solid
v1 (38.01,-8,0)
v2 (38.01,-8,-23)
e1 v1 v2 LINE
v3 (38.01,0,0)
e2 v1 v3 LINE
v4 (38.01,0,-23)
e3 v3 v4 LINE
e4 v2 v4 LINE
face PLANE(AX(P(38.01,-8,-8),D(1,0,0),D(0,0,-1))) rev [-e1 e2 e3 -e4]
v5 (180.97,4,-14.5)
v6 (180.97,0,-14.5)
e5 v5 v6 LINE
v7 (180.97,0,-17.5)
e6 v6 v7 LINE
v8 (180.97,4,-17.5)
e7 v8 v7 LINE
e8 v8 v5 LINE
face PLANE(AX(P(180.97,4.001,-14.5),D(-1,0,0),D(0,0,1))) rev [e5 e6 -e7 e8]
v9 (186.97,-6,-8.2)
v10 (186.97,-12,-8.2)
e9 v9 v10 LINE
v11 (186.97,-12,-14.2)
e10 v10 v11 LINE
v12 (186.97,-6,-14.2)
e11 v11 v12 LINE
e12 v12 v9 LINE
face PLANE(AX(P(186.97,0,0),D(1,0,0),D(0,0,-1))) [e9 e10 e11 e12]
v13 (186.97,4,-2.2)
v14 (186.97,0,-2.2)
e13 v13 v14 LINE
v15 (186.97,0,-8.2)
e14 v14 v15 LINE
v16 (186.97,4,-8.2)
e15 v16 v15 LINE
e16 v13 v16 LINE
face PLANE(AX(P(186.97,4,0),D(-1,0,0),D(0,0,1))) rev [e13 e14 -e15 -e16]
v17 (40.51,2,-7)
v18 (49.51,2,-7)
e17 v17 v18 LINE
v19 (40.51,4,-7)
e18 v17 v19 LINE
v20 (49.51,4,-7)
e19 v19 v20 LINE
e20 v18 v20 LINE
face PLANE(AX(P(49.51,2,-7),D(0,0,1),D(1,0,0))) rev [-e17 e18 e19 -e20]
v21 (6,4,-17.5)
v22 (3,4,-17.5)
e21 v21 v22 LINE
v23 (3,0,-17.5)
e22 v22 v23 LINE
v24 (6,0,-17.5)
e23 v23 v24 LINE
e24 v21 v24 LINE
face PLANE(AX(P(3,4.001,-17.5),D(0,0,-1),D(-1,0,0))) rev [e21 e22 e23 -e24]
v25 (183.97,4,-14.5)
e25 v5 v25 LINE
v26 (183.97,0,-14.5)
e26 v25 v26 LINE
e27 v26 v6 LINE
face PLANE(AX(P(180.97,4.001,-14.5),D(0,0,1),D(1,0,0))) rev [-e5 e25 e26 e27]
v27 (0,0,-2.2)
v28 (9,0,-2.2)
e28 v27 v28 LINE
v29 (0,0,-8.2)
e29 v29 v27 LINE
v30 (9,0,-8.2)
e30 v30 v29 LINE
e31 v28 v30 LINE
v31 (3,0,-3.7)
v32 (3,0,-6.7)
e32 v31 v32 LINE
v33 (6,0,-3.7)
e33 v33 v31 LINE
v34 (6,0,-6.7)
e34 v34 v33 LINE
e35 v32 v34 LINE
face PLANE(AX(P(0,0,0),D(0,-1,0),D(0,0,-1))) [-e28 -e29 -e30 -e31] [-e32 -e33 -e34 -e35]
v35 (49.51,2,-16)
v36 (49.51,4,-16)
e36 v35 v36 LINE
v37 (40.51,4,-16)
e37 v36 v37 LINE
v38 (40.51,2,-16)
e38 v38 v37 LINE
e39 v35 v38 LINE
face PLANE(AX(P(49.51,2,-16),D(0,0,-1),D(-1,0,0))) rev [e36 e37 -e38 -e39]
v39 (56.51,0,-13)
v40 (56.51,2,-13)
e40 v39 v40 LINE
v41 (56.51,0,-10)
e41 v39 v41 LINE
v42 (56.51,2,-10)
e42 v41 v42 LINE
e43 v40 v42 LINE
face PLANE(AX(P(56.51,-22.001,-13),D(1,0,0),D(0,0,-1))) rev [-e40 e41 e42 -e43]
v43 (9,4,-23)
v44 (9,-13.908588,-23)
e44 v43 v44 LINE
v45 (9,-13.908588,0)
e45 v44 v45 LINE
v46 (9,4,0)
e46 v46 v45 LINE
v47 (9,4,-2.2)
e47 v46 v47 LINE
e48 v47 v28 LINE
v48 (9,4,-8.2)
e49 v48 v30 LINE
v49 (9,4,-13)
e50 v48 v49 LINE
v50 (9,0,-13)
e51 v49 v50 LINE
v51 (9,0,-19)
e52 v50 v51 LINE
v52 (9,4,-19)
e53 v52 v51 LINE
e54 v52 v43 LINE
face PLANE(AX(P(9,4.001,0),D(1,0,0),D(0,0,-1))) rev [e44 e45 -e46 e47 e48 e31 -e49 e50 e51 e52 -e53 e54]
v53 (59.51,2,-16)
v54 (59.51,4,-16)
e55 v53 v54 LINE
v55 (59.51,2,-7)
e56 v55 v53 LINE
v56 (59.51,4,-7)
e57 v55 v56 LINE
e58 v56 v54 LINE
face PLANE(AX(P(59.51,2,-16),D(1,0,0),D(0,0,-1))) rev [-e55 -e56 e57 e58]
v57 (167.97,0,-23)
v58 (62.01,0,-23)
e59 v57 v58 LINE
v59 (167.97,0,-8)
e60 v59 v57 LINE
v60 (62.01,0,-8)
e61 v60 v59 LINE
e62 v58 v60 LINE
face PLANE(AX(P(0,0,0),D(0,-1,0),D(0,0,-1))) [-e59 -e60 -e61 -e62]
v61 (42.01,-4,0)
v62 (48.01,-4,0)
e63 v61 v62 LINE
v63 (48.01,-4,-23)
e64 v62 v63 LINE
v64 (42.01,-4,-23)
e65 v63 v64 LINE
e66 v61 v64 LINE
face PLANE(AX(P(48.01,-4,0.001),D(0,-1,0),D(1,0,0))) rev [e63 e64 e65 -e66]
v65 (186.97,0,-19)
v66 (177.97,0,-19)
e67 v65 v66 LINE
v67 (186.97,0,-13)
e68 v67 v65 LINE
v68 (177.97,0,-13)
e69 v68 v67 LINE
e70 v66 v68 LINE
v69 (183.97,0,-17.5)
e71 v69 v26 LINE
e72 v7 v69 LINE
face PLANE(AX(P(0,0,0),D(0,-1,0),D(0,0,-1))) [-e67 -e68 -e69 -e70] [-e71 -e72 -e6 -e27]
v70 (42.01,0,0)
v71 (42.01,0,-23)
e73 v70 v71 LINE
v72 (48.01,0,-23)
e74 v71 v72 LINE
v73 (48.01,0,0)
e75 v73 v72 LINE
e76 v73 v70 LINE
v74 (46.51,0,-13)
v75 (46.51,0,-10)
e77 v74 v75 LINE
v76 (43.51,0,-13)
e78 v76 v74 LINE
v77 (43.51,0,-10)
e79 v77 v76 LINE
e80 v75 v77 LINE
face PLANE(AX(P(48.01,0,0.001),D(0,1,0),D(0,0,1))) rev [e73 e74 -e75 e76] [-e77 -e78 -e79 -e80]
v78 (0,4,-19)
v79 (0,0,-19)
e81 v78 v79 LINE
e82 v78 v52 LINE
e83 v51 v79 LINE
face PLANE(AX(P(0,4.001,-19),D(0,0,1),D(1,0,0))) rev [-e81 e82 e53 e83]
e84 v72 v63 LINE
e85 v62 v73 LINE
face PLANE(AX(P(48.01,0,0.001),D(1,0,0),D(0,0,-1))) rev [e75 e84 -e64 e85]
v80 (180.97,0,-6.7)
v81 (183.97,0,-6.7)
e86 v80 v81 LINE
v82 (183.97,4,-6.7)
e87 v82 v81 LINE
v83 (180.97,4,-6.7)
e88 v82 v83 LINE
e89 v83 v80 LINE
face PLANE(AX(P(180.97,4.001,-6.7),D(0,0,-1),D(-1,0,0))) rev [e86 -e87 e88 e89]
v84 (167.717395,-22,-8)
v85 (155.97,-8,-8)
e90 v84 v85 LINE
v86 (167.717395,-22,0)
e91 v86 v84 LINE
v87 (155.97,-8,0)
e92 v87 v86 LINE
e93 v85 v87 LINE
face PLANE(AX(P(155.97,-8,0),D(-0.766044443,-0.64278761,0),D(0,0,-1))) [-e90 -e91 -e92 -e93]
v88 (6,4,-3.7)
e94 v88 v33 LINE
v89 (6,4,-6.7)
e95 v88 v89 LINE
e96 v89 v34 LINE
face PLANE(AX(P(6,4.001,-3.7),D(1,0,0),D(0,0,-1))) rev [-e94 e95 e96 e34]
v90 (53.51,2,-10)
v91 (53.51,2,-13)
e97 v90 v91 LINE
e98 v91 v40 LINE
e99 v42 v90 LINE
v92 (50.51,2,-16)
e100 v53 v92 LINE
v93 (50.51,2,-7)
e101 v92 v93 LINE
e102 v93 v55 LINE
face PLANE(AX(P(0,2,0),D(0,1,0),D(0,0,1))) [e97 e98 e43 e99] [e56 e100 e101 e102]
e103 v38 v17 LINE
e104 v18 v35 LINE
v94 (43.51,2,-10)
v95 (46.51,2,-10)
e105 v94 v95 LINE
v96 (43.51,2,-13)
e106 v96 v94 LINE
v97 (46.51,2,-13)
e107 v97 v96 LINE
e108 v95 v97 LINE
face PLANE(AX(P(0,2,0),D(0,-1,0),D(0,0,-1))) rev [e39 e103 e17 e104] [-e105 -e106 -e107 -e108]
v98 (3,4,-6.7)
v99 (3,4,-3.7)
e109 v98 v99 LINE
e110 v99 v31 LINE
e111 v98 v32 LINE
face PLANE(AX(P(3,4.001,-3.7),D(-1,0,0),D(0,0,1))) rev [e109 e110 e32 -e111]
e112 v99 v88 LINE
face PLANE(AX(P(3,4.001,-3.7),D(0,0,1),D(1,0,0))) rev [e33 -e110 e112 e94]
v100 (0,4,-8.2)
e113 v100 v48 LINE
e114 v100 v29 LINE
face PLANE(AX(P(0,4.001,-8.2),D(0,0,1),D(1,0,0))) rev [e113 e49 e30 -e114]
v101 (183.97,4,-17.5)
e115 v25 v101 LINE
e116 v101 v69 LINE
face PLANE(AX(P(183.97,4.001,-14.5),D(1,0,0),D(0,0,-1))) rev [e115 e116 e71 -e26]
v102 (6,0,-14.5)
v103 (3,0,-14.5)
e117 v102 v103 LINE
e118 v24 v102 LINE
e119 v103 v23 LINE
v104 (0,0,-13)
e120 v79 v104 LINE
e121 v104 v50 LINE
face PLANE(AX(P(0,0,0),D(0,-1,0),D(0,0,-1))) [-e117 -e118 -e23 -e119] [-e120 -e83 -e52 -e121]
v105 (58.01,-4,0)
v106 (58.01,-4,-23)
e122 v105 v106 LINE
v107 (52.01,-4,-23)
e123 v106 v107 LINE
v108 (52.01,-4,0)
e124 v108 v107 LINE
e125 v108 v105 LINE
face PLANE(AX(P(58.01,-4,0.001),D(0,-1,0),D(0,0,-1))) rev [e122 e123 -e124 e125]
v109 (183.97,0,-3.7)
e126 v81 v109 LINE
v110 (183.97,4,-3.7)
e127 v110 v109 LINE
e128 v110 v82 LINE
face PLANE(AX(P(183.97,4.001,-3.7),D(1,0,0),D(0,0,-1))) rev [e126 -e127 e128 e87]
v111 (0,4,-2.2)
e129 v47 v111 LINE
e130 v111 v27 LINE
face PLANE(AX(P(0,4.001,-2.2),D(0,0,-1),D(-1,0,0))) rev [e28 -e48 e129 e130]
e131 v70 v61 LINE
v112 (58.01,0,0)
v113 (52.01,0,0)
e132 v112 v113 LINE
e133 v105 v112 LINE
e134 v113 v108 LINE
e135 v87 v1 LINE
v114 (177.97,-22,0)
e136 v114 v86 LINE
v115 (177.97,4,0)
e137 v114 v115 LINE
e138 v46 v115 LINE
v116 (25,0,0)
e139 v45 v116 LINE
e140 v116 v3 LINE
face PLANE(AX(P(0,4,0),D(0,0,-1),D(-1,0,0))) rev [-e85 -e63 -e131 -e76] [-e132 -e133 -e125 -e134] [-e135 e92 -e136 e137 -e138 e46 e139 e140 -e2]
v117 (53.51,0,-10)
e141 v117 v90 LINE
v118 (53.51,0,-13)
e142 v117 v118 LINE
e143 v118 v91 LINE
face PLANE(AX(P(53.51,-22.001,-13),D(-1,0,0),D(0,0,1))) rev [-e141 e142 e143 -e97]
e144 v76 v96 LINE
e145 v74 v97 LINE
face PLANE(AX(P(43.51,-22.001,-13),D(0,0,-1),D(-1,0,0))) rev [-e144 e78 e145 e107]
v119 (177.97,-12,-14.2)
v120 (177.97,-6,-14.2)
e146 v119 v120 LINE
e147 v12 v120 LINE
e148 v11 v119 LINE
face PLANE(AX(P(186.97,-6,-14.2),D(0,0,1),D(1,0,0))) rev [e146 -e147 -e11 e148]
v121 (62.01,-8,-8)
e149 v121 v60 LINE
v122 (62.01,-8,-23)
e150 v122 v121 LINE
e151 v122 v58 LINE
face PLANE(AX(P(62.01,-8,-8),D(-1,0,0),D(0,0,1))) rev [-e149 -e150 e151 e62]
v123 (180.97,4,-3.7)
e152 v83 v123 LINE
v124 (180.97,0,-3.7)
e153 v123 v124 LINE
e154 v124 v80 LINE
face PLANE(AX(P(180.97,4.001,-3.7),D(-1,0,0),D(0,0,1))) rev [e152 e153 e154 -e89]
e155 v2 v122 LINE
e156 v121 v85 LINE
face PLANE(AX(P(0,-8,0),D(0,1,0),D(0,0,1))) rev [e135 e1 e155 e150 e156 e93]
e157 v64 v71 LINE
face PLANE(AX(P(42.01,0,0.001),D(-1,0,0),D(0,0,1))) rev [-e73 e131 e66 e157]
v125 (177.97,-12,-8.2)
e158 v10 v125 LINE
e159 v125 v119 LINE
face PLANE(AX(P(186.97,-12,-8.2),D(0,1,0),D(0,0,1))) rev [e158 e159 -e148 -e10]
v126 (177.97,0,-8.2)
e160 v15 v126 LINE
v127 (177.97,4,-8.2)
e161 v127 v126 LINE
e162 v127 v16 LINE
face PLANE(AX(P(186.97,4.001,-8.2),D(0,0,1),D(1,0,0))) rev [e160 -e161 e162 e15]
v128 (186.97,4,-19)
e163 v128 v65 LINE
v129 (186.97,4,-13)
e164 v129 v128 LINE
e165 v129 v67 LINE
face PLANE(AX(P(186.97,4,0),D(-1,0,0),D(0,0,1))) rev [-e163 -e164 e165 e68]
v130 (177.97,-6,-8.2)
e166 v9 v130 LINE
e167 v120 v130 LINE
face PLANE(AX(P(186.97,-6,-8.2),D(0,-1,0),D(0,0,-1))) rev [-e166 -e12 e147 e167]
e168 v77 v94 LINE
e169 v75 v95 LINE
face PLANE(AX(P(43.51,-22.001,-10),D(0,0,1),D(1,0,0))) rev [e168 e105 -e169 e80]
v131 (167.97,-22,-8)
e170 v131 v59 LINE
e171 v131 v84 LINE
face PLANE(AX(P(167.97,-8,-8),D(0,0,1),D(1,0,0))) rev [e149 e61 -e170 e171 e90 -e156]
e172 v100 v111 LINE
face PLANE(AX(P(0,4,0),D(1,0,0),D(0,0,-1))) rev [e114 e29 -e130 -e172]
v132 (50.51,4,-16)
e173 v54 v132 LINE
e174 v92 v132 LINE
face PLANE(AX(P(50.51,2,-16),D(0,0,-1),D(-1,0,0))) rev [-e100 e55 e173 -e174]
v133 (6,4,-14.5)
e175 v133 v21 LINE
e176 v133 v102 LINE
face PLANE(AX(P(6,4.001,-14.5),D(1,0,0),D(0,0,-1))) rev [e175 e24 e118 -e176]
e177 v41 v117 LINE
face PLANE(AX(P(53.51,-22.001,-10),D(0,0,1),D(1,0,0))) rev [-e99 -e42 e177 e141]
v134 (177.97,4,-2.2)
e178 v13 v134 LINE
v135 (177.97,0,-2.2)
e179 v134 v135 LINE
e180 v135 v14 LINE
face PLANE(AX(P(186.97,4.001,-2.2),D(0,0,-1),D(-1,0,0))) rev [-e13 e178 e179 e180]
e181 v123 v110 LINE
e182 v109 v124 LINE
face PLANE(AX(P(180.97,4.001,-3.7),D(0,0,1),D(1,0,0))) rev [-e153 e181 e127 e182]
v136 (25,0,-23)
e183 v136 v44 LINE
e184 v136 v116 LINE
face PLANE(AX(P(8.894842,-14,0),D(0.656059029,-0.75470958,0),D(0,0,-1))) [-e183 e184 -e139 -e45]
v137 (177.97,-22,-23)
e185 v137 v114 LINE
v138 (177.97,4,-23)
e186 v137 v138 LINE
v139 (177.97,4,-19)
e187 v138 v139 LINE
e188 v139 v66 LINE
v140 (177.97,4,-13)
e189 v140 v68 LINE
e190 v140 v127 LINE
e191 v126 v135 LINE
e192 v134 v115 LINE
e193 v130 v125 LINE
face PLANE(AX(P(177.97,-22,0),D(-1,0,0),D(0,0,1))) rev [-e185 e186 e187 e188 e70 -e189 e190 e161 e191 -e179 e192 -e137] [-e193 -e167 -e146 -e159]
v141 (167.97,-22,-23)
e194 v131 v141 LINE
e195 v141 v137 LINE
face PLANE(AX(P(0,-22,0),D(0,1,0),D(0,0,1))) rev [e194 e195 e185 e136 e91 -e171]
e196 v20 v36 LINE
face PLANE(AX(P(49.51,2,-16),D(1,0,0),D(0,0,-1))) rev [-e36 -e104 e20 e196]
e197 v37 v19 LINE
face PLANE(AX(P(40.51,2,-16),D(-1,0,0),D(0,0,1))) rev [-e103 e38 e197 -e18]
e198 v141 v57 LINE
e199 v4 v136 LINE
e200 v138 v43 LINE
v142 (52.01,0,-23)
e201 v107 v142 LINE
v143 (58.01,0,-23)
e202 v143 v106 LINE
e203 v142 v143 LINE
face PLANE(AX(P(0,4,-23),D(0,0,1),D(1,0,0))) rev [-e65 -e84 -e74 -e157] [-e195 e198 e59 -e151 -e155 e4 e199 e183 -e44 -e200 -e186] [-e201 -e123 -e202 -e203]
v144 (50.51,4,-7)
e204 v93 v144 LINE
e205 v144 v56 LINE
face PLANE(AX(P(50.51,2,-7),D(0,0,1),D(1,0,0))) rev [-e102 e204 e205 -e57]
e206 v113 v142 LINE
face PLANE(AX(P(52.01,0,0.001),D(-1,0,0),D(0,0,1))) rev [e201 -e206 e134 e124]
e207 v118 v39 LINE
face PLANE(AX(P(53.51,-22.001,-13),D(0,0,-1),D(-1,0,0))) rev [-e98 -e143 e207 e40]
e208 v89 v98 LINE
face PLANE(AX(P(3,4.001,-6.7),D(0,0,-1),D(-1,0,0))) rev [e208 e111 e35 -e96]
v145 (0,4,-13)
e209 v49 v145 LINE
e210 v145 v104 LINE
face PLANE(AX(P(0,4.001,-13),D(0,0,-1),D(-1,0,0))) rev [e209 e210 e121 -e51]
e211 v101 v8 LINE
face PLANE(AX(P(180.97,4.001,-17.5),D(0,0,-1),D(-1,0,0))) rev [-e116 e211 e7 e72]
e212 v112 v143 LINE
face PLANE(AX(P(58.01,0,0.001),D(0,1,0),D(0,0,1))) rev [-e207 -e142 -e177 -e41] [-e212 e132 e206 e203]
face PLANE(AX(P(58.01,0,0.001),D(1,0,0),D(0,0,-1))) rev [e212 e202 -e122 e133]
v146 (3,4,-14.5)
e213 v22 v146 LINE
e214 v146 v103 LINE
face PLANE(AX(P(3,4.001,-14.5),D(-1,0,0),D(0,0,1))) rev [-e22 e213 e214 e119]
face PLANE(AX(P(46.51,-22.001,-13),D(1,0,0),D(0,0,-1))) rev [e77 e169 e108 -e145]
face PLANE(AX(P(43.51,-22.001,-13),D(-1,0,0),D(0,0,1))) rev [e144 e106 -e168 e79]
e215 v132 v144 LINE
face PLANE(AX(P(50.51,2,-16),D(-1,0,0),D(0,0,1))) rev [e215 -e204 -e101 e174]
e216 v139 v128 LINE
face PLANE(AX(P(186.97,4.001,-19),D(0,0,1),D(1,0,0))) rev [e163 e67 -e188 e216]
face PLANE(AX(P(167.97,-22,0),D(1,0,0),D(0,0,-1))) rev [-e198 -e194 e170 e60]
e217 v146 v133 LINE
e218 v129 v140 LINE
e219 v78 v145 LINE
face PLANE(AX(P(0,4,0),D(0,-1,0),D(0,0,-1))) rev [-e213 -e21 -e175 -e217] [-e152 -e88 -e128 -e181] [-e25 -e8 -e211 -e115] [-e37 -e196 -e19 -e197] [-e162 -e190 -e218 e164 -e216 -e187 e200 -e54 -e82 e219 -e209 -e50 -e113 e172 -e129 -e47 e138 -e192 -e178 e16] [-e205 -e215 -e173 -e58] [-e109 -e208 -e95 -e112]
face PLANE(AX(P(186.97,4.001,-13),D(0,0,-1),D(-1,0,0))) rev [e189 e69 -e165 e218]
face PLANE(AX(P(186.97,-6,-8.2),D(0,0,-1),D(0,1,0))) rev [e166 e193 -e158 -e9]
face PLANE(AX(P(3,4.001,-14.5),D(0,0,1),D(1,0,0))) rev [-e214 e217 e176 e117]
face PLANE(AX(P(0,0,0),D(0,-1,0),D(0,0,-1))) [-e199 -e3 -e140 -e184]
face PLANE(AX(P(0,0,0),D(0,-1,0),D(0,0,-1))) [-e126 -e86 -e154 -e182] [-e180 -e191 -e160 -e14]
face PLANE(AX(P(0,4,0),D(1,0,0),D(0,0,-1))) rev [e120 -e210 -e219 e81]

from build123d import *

# Parameters (mm, degrees)
SKETCH1_W           = 186.97
SKETCH1_H           = 23
BOSS_EXTRUDE1_DEPTH = 4
SKETCH2_W           = 10
SKETCH2_H           = 23
BOSS_EXTRUDE2_DEPTH = 22
BOSS_EXTRUDE3_DEPTH = 8
CHAMFER1_SIZE       = 14.301043111
CHAMFER1_SIZE_2     = 12
CUT_EXTRUDE1_REACH  = 191.66
SKETCH4_W           = 9
SKETCH4_H           = 4.8
SKETCH4_H_2         = 4
SKETCH4_H_3         = 2.2
SKETCH4_W_2         = 3
SKETCH4_H_4         = 3
SKETCH5_W           = 6
SKETCH5_H           = 6
BOSS_EXTRUDE4_DEPTH = 9
CUT_EXTRUDE2_REACH  = 191.66
SKETCH6_W           = 6
SKETCH6_H           = 4
CUT_EXTRUDE3_REACH  = 192.165
SKETCH7_W           = 3
SKETCH7_H           = 3
SKETCH8_W           = 16
SKETCH8_H           = 23
BOSS_EXTRUDE5_DEPTH = 14
CHAMFER2_SIZE       = 14
CHAMFER2_SIZE_2     = 16.105157701
SKETCH9_W           = 9
SKETCH9_H           = 9
CUT_EXTRUDE4_DEPTH  = 2


with BuildPart() as part:
    # Sketch1 → Boss-Extrude1 (new body)
    with BuildSketch(Plane(origin=(0, 0, 0), x_dir=(1, 0, 0), z_dir=(0, 1, 0))):
        with Locations((93.485, 11.5)):
            Rectangle(SKETCH1_W, SKETCH1_H)
    extrude(amount=BOSS_EXTRUDE1_DEPTH)

    # Sketch2 → Boss-Extrude2 (add)
    with BuildSketch(Plane.XZ):
        with Locations((172.97, -11.5)):
            Rectangle(SKETCH2_W, SKETCH2_H)
    extrude(amount=BOSS_EXTRUDE2_DEPTH)

    # Sketch3 → Boss-Extrude3 (add)
    with BuildSketch(Plane.XZ):
        Polygon((167.97, 0), (38.01, 0), (38.01, -8), (38.01, -23), (62.01, -23), (62.01, -8), (167.97, -8), align=None)
    extrude(amount=BOSS_EXTRUDE3_DEPTH)

    # Chamfer1
    # the kernel refuses this chamfer: 14.301043111, 12 mm, written as the material it adds along each edge
    with BuildSketch(Plane(origin=(167.97, -8, -8), x_dir=(0.024939322090235156, -0.9996889667359941, 0), z_dir=(0, 0, 1))) as chamfer1_piece_1_section:
        Polygon((CHAMFER1_SIZE * 0.999688966745, -CHAMFER1_SIZE * 0.0249393220905), (-CHAMFER1_SIZE_2 * 0.0249393220902, -CHAMFER1_SIZE_2 * 0.999688966736), (0, 0), align=None)
    chamfer1_piece_1 = extrude(amount=8, mode=Mode.PRIVATE)
    chamfer1_piece_1 = split(chamfer1_piece_1, bisect_by=Plane(origin=(164.021429924, -22, -4), z_dir=(0, 1, 0)), keep=Keep.TOP, mode=Mode.PRIVATE)
    add(chamfer1_piece_1)

    # Sketch4 → Cut-Extrude1 (cut, up to next)
    with BuildSketch(Plane.XZ, mode=Mode.PRIVATE) as cut_extrude1_sk1:
        with Locations((182.47, -10.6)):
            Rectangle(SKETCH4_W, SKETCH4_H)
    cut_extrude1_tool1 = extrude(cut_extrude1_sk1.sketch, amount=-CUT_EXTRUDE1_REACH, mode=Mode.PRIVATE) & part.part
    # Sketch4 → Cut-Extrude1 (cut, up to next)
    with BuildSketch(Plane.XZ, mode=Mode.PRIVATE) as cut_extrude1_sk2:
        with Locations((182.47, -21)):
            Rectangle(SKETCH4_W, SKETCH4_H_2)
    cut_extrude1_tool2 = extrude(cut_extrude1_sk2.sketch, amount=-CUT_EXTRUDE1_REACH, mode=Mode.PRIVATE) & part.part
    # Sketch4 → Cut-Extrude1 (cut, up to next)
    with BuildSketch(Plane.XZ, mode=Mode.PRIVATE) as cut_extrude1_sk3:
        with Locations((182.47, -1.1)):
            Rectangle(SKETCH4_W, SKETCH4_H_3)
    cut_extrude1_tool3 = extrude(cut_extrude1_sk3.sketch, amount=-CUT_EXTRUDE1_REACH, mode=Mode.PRIVATE) & part.part
    # Sketch4 → Cut-Extrude1 (cut, up to next)
    with BuildSketch(Plane.XZ, mode=Mode.PRIVATE) as cut_extrude1_sk4:
        with Locations((182.47, -16)):
            Rectangle(SKETCH4_W_2, SKETCH4_H_4)
    cut_extrude1_tool4 = extrude(cut_extrude1_sk4.sketch, amount=-CUT_EXTRUDE1_REACH, mode=Mode.PRIVATE) & part.part
    # Sketch4 → Cut-Extrude1 (cut, up to next)
    with BuildSketch(Plane.XZ, mode=Mode.PRIVATE) as cut_extrude1_sk5:
        with Locations((182.47, -5.2)):
            Rectangle(SKETCH4_W_2, SKETCH4_H_4)
    cut_extrude1_tool5 = extrude(cut_extrude1_sk5.sketch, amount=-CUT_EXTRUDE1_REACH, mode=Mode.PRIVATE) & part.part
    # Sketch4 → Cut-Extrude1 (cut, up to next)
    with BuildSketch(Plane.XZ, mode=Mode.PRIVATE) as cut_extrude1_sk6:
        with Locations((4.5, -1.1)):
            Rectangle(SKETCH4_W, SKETCH4_H_3)
    cut_extrude1_tool6 = extrude(cut_extrude1_sk6.sketch, amount=-CUT_EXTRUDE1_REACH, mode=Mode.PRIVATE) & part.part
    # Sketch4 → Cut-Extrude1 (cut, up to next)
    with BuildSketch(Plane.XZ, mode=Mode.PRIVATE) as cut_extrude1_sk7:
        with Locations((4.5, -5.2)):
            Rectangle(SKETCH4_W_2, SKETCH4_H_4)
    cut_extrude1_tool7 = extrude(cut_extrude1_sk7.sketch, amount=-CUT_EXTRUDE1_REACH, mode=Mode.PRIVATE) & part.part
    # Sketch4 → Cut-Extrude1 (cut, up to next)
    with BuildSketch(Plane.XZ, mode=Mode.PRIVATE) as cut_extrude1_sk8:
        with Locations((4.5, -10.6)):
            Rectangle(SKETCH4_W, SKETCH4_H)
    cut_extrude1_tool8 = extrude(cut_extrude1_sk8.sketch, amount=-CUT_EXTRUDE1_REACH, mode=Mode.PRIVATE) & part.part
    # Sketch4 → Cut-Extrude1 (cut, up to next)
    with BuildSketch(Plane.XZ, mode=Mode.PRIVATE) as cut_extrude1_sk9:
        with Locations((4.5, -16)):
            Rectangle(SKETCH4_W_2, SKETCH4_H_4)
    cut_extrude1_tool9 = extrude(cut_extrude1_sk9.sketch, amount=-CUT_EXTRUDE1_REACH, mode=Mode.PRIVATE) & part.part
    # Sketch4 → Cut-Extrude1 (cut, up to next)
    with BuildSketch(Plane.XZ, mode=Mode.PRIVATE) as cut_extrude1_sk10:
        with Locations((4.5, -21)):
            Rectangle(SKETCH4_W, SKETCH4_H_2)
    cut_extrude1_tool10 = extrude(cut_extrude1_sk10.sketch, amount=-CUT_EXTRUDE1_REACH, mode=Mode.PRIVATE) & part.part
    add(cut_extrude1_tool1.solids().sort_by_distance((182.47, 0, -10.6))[0], mode=Mode.SUBTRACT)
    add(cut_extrude1_tool2.solids().sort_by_distance((182.47, 0, -21))[0], mode=Mode.SUBTRACT)
    add(cut_extrude1_tool3.solids().sort_by_distance((182.47, 0, -1.1))[0], mode=Mode.SUBTRACT)
    add(cut_extrude1_tool4.solids().sort_by_distance((182.47, 0, -16))[0], mode=Mode.SUBTRACT)
    add(cut_extrude1_tool5.solids().sort_by_distance((182.47, 0, -5.2))[0], mode=Mode.SUBTRACT)
    add(cut_extrude1_tool6.solids().sort_by_distance((4.5, 0, -1.1))[0], mode=Mode.SUBTRACT)
    add(cut_extrude1_tool7.solids().sort_by_distance((4.5, 0, -5.2))[0], mode=Mode.SUBTRACT)
    add(cut_extrude1_tool8.solids().sort_by_distance((4.5, 0, -10.6))[0], mode=Mode.SUBTRACT)
    add(cut_extrude1_tool9.solids().sort_by_distance((4.5, 0, -16))[0], mode=Mode.SUBTRACT)
    add(cut_extrude1_tool10.solids().sort_by_distance((4.5, 0, -21))[0], mode=Mode.SUBTRACT)

    # Sketch5 → Boss-Extrude4 (add)
    with BuildSketch(Plane(origin=(177.97, 0, 0), x_dir=(0, 0, -1), z_dir=(1, 0, 0))):
        with Locations((11.2, -9)):
            Rectangle(SKETCH5_W, SKETCH5_H)
    extrude(amount=BOSS_EXTRUDE4_DEPTH)

    # Sketch6 → Cut-Extrude2 (cut, up to next)
    with BuildSketch(Plane(origin=(0, 0, -23), x_dir=(-1, 0, 0), z_dir=(0, 0, -1)), mode=Mode.PRIVATE) as cut_extrude2_sk1:
        with Locations((-55.01, -2)):
            Rectangle(SKETCH6_W, SKETCH6_H)
    cut_extrude2_tool1 = extrude(cut_extrude2_sk1.sketch, amount=-CUT_EXTRUDE2_REACH, mode=Mode.PRIVATE) & part.part
    # Sketch6 → Cut-Extrude2 (cut, up to next)
    with BuildSketch(Plane(origin=(0, 0, -23), x_dir=(-1, 0, 0), z_dir=(0, 0, -1)), mode=Mode.PRIVATE) as cut_extrude2_sk2:
        with Locations((-45.01, -2)):
            Rectangle(SKETCH6_W, SKETCH6_H)
    cut_extrude2_tool2 = extrude(cut_extrude2_sk2.sketch, amount=-CUT_EXTRUDE2_REACH, mode=Mode.PRIVATE) & part.part
    add(cut_extrude2_tool1.solids().sort_by_distance((55.01, -2, -23))[0], mode=Mode.SUBTRACT)
    add(cut_extrude2_tool2.solids().sort_by_distance((45.01, -2, -23))[0], mode=Mode.SUBTRACT)

    # Sketch7 → Cut-Extrude3 (cut, up to next)
    with BuildSketch(Plane(origin=(0, 4, 0), x_dir=(1, 0, 0), z_dir=(0, 1, 0)), mode=Mode.PRIVATE) as cut_extrude3_sk1:
        with Locations((45.01, 11.5)):
            Rectangle(SKETCH7_W, SKETCH7_H)
    cut_extrude3_tool1 = extrude(cut_extrude3_sk1.sketch, amount=-CUT_EXTRUDE3_REACH, mode=Mode.PRIVATE) & part.part
    # Sketch7 → Cut-Extrude3 (cut, up to next)
    with BuildSketch(Plane(origin=(0, 4, 0), x_dir=(1, 0, 0), z_dir=(0, 1, 0)), mode=Mode.PRIVATE) as cut_extrude3_sk2:
        with Locations((55.01, 11.5)):
            Rectangle(SKETCH7_W, SKETCH7_H)
    cut_extrude3_tool2 = extrude(cut_extrude3_sk2.sketch, amount=-CUT_EXTRUDE3_REACH, mode=Mode.PRIVATE) & part.part
    add(cut_extrude3_tool1.solids().sort_by_distance((45.01, 4, -11.5))[0], mode=Mode.SUBTRACT)
    add(cut_extrude3_tool2.solids().sort_by_distance((55.01, 4, -11.5))[0], mode=Mode.SUBTRACT)

    # Sketch8 → Boss-Extrude5 (add)
    with BuildSketch(Plane.XZ):
        with Locations((17, -11.5)):
            Rectangle(SKETCH8_W, SKETCH8_H)
    extrude(amount=BOSS_EXTRUDE5_DEPTH)

    # Chamfer2
    # the kernel refuses this chamfer: 16.105157701, 14 mm, written as the material it takes off along each edge
    with BuildSketch(Plane(origin=(25, -14, 41.491821244), x_dir=(0.033690971337926715, 0.9994322980824198, 0), z_dir=(0, 0, -1))) as chamfer2_piece_1_section:
        Polygon((CHAMFER2_SIZE * 0.999432298082, -CHAMFER2_SIZE * 0.0336909713379), (-CHAMFER2_SIZE_2 * 0.0336909713381, -CHAMFER2_SIZE_2 * 0.999432298088), (0, 0), align=None)
    chamfer2_piece_1 = extrude(amount=105.983642488, mode=Mode.PRIVATE)
    chamfer2_piece_1 = split(chamfer2_piece_1, bisect_by=Plane(origin=(19.65817275, 0, -11.5), z_dir=(0, -1, 0)), keep=Keep.TOP, mode=Mode.PRIVATE)
    add(chamfer2_piece_1, mode=Mode.SUBTRACT)

    # Sketch9 → Cut-Extrude4 (cut)
    with BuildSketch(Plane(origin=(0, 4, 0), x_dir=(1, 0, 0), z_dir=(0, 1, 0))):
        with Locations((45.01, 11.5)):
            Rectangle(SKETCH9_W, SKETCH9_H)
        with Locations((55.01, 11.5)):
            Rectangle(SKETCH9_W, SKETCH9_H)
    extrude(amount=-CUT_EXTRUDE4_DEPTH, mode=Mode.SUBTRACT)


solid = part.part
